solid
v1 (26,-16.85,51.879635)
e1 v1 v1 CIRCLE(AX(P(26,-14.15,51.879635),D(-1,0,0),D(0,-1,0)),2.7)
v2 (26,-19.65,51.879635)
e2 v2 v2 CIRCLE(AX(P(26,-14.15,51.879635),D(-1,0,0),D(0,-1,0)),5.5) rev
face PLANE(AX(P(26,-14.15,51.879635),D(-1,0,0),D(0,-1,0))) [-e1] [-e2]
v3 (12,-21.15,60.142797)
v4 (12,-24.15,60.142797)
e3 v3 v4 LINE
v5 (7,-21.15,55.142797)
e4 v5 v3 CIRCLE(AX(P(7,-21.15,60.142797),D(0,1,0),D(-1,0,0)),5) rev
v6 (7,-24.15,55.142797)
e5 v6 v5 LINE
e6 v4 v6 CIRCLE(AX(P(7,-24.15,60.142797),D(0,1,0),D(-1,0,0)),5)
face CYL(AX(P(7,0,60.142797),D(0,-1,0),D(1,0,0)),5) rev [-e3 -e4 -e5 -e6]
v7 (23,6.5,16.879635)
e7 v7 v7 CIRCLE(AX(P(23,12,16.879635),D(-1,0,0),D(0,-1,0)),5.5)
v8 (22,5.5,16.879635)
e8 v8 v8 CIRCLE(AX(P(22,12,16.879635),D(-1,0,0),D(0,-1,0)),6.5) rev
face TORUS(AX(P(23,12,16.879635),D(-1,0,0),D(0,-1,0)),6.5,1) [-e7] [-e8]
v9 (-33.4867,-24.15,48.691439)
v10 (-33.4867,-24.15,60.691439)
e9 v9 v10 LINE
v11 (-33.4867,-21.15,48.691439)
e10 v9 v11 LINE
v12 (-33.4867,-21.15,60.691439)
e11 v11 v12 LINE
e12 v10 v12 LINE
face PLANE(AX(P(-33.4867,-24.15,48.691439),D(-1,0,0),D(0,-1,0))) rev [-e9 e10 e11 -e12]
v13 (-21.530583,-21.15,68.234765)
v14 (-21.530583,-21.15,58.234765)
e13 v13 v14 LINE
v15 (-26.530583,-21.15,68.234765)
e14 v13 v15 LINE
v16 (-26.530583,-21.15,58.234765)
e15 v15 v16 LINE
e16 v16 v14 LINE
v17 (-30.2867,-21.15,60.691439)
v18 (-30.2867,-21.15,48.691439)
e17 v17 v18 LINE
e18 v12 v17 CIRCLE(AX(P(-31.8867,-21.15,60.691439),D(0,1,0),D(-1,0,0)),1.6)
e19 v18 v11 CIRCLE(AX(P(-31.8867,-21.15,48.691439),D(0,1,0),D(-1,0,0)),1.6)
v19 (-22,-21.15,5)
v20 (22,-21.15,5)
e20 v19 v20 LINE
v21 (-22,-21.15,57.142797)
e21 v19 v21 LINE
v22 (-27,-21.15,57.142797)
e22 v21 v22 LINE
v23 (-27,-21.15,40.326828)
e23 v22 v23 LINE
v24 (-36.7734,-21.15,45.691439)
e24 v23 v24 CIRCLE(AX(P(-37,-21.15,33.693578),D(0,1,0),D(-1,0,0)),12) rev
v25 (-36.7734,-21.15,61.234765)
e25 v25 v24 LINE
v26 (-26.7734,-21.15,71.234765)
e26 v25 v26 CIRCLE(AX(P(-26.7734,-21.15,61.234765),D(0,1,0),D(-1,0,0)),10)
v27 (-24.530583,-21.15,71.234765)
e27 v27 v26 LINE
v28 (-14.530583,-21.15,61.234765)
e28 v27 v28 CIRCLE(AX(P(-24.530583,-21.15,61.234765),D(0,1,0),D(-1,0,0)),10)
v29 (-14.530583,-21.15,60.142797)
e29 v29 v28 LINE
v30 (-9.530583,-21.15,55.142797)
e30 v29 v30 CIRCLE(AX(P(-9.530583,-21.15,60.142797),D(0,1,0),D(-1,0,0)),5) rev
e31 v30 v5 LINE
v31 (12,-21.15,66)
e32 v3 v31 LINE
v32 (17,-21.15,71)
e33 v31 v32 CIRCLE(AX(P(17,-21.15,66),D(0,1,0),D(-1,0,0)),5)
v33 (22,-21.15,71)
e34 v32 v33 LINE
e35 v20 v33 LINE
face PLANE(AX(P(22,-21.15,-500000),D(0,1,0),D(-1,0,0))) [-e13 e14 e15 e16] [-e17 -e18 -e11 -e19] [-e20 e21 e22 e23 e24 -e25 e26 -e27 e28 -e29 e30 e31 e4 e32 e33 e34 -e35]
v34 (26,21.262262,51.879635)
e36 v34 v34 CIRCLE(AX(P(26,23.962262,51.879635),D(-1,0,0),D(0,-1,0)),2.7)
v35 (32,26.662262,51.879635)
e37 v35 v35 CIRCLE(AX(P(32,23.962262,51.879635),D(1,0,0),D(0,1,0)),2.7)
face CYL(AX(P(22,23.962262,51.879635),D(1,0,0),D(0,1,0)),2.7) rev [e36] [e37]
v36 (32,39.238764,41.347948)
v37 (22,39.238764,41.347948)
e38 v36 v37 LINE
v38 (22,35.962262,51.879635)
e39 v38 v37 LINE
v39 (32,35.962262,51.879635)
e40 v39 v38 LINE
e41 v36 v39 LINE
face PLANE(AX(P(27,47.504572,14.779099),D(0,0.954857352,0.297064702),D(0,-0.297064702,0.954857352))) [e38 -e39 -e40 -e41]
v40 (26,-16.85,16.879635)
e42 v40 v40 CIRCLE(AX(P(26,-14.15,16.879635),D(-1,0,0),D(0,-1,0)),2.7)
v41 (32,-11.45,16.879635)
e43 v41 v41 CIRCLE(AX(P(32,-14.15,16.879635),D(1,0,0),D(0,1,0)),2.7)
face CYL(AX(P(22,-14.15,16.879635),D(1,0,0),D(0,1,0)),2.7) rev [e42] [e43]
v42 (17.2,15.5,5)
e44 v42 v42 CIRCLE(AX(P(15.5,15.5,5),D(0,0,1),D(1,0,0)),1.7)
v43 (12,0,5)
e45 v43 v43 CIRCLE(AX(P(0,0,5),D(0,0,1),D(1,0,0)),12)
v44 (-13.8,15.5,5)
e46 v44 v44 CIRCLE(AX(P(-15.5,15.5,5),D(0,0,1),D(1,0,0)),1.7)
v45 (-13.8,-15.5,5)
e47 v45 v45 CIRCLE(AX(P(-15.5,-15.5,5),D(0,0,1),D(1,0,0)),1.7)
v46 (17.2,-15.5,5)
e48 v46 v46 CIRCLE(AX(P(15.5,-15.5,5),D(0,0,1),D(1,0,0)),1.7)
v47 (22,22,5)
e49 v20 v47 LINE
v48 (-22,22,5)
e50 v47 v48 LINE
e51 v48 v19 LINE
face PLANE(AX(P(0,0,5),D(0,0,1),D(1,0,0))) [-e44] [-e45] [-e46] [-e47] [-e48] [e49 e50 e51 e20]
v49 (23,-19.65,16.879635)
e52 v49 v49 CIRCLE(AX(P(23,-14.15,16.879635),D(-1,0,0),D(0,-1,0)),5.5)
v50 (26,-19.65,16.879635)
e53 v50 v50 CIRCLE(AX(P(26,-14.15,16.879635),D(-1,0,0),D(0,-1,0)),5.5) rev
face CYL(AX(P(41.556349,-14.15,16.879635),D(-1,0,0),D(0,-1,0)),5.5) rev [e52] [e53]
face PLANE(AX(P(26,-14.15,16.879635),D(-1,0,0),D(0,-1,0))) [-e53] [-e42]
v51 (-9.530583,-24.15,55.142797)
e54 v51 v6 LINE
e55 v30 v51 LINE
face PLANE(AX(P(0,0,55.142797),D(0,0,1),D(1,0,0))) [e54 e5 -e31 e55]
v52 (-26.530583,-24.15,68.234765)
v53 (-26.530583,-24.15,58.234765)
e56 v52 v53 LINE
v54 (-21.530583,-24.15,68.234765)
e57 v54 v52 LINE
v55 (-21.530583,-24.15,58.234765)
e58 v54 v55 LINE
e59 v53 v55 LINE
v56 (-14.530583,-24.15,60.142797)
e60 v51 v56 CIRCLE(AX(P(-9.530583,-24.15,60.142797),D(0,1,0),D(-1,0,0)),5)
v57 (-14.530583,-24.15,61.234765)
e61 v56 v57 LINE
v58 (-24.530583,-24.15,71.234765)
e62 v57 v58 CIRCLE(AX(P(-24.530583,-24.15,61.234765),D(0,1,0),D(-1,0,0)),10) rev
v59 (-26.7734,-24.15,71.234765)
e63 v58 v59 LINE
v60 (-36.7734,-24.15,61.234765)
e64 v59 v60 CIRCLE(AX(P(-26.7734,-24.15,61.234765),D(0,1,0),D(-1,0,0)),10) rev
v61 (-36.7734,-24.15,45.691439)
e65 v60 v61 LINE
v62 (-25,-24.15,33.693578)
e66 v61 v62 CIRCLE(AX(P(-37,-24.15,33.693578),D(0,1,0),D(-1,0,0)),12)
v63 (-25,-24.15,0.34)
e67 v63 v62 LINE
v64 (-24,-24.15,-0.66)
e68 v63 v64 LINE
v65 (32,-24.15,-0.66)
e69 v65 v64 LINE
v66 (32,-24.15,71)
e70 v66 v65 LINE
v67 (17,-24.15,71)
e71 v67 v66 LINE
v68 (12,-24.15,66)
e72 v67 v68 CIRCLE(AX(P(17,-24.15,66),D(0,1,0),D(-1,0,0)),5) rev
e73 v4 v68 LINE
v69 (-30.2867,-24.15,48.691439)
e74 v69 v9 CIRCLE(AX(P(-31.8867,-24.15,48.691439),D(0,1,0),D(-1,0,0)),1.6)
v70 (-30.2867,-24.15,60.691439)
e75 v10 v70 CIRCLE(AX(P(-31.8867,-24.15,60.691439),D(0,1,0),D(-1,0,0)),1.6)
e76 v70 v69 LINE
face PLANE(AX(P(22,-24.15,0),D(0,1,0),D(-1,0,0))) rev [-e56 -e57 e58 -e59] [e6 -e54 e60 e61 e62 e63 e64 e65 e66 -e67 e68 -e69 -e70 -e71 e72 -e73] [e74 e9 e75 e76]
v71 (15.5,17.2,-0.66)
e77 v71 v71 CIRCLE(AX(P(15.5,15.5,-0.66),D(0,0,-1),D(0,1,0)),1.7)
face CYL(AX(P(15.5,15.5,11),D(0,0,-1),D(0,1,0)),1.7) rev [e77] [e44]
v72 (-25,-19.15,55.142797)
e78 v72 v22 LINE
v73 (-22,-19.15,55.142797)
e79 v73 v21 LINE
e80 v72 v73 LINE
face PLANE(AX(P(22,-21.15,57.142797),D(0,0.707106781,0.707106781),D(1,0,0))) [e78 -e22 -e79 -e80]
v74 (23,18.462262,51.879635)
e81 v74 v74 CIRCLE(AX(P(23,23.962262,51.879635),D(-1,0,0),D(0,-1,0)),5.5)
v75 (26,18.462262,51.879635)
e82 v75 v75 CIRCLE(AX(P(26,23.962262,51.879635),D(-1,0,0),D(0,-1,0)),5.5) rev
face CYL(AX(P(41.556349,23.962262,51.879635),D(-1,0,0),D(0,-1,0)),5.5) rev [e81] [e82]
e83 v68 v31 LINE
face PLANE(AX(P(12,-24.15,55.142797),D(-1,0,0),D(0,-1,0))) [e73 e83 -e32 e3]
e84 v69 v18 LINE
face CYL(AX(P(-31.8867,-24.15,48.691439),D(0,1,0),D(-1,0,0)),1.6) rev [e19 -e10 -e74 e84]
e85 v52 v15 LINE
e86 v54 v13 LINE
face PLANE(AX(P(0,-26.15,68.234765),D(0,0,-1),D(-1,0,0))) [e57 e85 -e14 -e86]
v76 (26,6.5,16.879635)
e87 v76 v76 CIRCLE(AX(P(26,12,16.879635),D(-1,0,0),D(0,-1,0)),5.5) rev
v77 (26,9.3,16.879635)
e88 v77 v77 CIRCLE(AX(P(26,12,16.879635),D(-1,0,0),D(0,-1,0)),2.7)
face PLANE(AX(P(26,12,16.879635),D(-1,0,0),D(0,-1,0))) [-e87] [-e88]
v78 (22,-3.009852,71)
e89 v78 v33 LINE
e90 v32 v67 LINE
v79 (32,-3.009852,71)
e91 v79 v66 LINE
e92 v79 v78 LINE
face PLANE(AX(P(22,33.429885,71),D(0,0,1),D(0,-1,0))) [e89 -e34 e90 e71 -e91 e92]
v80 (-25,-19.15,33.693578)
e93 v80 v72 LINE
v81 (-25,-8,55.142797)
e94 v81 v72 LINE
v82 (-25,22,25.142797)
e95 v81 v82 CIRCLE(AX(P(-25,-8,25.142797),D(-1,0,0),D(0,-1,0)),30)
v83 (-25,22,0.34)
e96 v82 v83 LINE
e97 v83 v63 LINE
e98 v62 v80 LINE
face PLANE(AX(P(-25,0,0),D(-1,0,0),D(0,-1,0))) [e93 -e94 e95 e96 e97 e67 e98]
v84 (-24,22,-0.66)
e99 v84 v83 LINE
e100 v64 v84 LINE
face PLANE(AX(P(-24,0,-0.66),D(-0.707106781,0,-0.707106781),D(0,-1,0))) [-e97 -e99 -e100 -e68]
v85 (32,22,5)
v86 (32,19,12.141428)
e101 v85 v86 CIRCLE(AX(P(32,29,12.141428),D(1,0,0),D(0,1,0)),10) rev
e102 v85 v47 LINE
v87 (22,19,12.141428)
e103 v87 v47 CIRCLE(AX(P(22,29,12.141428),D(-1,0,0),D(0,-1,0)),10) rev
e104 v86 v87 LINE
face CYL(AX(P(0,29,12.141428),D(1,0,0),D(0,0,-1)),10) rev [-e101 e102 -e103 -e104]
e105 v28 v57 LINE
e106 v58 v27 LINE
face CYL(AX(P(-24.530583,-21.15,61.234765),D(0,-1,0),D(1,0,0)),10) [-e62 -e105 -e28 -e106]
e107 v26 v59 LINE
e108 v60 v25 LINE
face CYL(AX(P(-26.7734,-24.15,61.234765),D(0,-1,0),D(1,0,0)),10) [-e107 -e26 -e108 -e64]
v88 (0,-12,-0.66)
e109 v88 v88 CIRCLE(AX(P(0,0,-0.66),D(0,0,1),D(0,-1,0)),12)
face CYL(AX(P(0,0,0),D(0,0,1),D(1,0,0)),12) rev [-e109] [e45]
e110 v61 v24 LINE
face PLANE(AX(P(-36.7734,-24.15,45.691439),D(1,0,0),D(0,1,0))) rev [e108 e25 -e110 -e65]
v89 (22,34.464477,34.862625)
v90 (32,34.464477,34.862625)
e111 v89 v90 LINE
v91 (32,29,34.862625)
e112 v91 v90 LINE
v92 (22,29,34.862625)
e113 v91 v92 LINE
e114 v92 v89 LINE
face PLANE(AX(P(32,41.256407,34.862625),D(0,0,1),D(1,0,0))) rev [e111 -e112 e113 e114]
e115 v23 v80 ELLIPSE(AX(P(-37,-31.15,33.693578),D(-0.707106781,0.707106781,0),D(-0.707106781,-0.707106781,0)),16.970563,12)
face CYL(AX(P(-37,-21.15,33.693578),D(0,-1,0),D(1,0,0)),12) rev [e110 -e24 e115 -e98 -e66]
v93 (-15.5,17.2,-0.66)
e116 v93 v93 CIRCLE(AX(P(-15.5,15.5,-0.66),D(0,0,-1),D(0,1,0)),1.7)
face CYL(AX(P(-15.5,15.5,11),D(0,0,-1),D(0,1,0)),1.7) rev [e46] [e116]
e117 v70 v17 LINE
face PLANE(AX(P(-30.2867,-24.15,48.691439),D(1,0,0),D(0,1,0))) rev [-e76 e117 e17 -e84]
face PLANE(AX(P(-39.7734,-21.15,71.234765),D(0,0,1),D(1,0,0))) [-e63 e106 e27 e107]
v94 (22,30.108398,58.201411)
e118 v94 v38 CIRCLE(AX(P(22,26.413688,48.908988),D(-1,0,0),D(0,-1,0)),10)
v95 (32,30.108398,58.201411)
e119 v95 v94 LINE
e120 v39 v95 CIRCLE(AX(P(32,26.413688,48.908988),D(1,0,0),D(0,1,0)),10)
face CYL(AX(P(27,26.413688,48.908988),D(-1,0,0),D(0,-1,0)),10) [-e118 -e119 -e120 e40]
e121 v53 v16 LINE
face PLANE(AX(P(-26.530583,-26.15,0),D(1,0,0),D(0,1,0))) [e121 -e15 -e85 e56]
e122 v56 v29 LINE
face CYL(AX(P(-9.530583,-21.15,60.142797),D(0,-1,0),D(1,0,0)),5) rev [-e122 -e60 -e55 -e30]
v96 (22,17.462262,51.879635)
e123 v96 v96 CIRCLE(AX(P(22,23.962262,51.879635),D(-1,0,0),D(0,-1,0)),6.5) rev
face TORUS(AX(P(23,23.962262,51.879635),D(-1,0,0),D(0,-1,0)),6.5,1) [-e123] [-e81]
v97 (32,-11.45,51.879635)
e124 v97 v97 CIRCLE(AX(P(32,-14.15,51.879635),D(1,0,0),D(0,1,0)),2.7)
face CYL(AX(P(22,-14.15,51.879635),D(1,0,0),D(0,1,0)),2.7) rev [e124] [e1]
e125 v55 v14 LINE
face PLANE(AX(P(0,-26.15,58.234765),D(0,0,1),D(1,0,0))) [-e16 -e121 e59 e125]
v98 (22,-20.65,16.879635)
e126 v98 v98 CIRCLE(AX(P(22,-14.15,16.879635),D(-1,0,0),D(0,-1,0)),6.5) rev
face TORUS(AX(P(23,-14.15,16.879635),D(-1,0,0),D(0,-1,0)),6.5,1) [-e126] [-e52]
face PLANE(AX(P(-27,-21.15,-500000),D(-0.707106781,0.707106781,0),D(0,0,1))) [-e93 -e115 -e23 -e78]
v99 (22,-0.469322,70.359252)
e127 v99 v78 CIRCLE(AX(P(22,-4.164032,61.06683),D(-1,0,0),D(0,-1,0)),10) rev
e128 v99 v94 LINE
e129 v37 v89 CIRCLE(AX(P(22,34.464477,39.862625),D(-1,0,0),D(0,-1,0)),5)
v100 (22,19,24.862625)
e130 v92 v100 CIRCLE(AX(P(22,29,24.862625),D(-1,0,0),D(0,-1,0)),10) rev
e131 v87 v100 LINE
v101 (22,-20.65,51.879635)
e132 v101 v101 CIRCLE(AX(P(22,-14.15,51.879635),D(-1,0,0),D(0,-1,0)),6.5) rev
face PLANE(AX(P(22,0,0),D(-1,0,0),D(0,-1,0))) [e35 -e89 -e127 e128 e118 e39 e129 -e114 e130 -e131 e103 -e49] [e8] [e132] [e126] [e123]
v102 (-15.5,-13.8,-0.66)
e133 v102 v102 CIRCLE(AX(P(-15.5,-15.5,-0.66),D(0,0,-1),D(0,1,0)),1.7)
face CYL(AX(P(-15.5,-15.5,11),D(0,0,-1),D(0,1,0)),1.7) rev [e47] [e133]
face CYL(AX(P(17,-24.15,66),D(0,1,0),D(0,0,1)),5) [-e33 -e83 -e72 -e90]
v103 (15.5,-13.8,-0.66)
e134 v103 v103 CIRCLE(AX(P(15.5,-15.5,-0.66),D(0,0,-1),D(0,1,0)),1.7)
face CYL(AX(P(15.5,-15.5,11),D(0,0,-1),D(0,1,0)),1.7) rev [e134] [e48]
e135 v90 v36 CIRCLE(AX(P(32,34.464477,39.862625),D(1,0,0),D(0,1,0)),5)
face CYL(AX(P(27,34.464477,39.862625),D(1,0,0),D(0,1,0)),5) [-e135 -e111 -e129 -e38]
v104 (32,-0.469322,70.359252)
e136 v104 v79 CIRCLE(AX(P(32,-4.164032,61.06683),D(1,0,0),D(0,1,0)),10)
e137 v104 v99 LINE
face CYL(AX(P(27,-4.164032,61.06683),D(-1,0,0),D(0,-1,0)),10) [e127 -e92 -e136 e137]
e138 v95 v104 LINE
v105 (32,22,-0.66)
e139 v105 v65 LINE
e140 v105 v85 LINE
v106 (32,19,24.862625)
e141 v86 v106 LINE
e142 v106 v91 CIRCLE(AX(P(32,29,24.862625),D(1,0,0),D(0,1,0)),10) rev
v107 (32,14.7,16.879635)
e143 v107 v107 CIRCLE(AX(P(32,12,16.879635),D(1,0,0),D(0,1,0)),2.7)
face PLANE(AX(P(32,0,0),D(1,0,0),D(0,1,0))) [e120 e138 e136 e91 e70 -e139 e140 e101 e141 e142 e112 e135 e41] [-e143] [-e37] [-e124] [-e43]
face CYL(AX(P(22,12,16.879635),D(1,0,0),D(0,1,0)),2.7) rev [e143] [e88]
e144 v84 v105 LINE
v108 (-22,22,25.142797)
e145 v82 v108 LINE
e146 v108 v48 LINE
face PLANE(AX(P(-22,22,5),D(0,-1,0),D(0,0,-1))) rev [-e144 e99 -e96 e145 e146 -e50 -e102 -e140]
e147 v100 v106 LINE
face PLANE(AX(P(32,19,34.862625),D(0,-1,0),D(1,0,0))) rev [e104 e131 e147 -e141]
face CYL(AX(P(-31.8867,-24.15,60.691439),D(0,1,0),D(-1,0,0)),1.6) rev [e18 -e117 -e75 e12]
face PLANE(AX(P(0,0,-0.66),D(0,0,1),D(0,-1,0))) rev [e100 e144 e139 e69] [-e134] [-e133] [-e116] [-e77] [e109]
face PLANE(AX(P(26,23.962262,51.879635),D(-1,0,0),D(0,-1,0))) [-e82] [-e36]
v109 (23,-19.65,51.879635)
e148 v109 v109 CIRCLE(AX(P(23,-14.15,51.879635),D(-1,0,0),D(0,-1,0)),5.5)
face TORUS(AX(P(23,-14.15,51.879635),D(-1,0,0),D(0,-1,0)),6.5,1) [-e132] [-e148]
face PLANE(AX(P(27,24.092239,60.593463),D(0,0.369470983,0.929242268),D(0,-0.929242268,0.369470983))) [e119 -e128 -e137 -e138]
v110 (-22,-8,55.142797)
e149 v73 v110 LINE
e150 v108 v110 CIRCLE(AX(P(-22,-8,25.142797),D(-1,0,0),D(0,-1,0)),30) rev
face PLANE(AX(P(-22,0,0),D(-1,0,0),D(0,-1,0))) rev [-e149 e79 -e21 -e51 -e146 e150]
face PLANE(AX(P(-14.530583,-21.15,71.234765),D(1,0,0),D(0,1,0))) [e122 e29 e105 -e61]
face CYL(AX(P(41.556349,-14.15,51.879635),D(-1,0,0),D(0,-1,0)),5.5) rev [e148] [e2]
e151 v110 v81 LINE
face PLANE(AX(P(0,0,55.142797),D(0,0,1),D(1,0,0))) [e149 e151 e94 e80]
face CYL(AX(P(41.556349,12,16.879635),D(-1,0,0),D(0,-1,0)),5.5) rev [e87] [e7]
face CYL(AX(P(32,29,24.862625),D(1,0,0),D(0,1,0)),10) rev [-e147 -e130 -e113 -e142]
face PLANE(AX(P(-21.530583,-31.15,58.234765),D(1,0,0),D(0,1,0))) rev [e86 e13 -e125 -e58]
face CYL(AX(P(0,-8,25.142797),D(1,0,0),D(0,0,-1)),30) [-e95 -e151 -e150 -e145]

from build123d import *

# Parameters (mm, degrees)
SKETCH_1_W            = 44
SKETCH_1_H            = 44
EXTRUDE_2_DEPTH       = 5
SKETCH_2_R            = 1.5
SKETCH_2_R_2          = 10
CUT_EXTRUDE_1_DEPTH   = 32.511902513
SKETCH_3_R            = 12
CUT_EXTRUDE_3_DEPTH   = 32.511902513
EXTRUDE_4_DEPTH       = 3
EXTRUDE_5_REACH       = 63.87
SKETCH_6_W            = 44
SKETCH_6_H            = 0.85
SKETCH_7_W            = 44
SKETCH_7_H            = 0.85
CUT_EXTRUDE_4_DEPTH   = 62.869792746
SKETCH_8_W            = 52.142796764
SKETCH_8_H            = 46.15
EXTRUDE_6_DEPTH       = 3
SKETCH_10_W           = 3
SKETCH_10_H           = 43.15
SKETCH_10_W_2         = 47
SKETCH_10_H_2         = 3
EXTRUDE_7_DEPTH       = 3
SKETCH_11_W           = 1
SKETCH_11_H           = 46.15
CUT_EXTRUDE_5_DEPTH   = 77.373755538
SKETCH_12_R           = 1.55
CUT_EXTRUDE_6_DEPTH   = 65.340228018
SKETCH_14_W           = 54.142796764
SKETCH_14_H           = 46.15
EXTRUDE_8_DEPTH       = 5
EXTRUDE_9_DEPTH       = 5
SKETCH_17_W           = 70
SKETCH_17_H           = 13.120666122
EXTRUDE_10_DEPTH      = 5
CUT_EXTRUDE_8_DEPTH   = 98.040990462
EXTRUDE_12_DEPTH      = 5
CUT_EXTRUDE_9_DEPTH   = 98.040990462
FILLET_2_R            = 5
SKETCH_23_W           = 10
SKETCH_23_H           = 15.857203236
EXTRUDE_13_DEPTH      = 3
FILLET_3_R            = 5
FILLET_4_R            = 5
EXTRUDE_14_DEPTH      = 3
FILLET_5_R            = 5
SKETCH_26_W           = 3
SKETCH_26_H           = 25.543326292
CUT_EXTRUDE_10_DEPTH  = 102.638722513
FILLET_10_R           = 10
FILLET_11_R           = 12
CHAMFER_1_SIZE        = 2
CUT_EXTRUDE_11_DEPTH  = 101.502684118
FILLET_12_R           = 30
SKETCH_28_W           = 2
SKETCH_28_H           = 10
CUT_EXTRUDE_12_DEPTH  = 5
CHAMFER_2_SIZE        = 1
SKETCH_29_R           = 2.55
CUT_EXTRUDE_14_DEPTH  = 12
SKETCH_30_R           = 4.5
CUT_EXTRUDE_15_DEPTH  = 4
FILLET_13_R           = 1
SKETCH_33_R           = 7.046537577
EXTRUDE_15_DEPTH      = 10
CUT_EXTRUDE_START     = -10
CUT_EXTRUDE_16_DEPTH  = 10
SKETCH_35_R           = 4.5
CUT_EXTRUDE_17_DEPTH  = 4
FILLET_15_R           = 1
SKETCH_36_R           = 1.7
CUT_EXTRUDE_18_DEPTH  = 10
EXTRUDE_16_DEPTH      = 1.66
EXTRUDE_16_DEPTH_BACK = 2
SKETCH_37_W           = 57
SKETCH_37_H           = 46.15
SKETCH_37_R           = 1.7
CHAMFER_3_SIZE        = 1
SKETCH_38_W           = 29.862624896
SKETCH_38_H           = 3
CUT_EXTRUDE_19_DEPTH  = 101.429822344
FILLET_16_R           = 10
SKETCH_39_R           = 2.7
CUT_EXTRUDE_20_DEPTH  = 10
SKETCH_40_R           = 12
CUT_EXTRUDE_21_DEPTH  = 10
SKETCH_41_R           = 5.5
CUT_EXTRUDE_22_DEPTH  = 4
FILLET_17_R           = 1
SKETCH_42_W           = 5
SKETCH_42_H           = 10
CUT_EXTRUDE_23_DEPTH  = 10


# Read off the part's stored shape, not the designer's step: Вырез-Вытянуть16
with BuildPart() as part:
    # Эскиз1 → Бобышка-Вытянуть2 (new body)
    with BuildSketch(Plane.XY):
        Rectangle(SKETCH_1_W, SKETCH_1_H)
    extrude(amount=EXTRUDE_2_DEPTH)

    # Эскиз2 → Вырез-Вытянуть1 (cut, through all)
    with BuildSketch(Plane.XY.offset(5)):
        with Locations((-15.5, 15.5)):
            Circle(SKETCH_2_R)
        Circle(SKETCH_2_R_2)
        with Locations((15.5, 15.5)):
            Circle(SKETCH_2_R)
        with Locations((15.5, -15.5)):
            Circle(SKETCH_2_R)
        with Locations((-15.5, -15.5)):
            Circle(SKETCH_2_R)
    extrude(amount=-CUT_EXTRUDE_1_DEPTH, mode=Mode.SUBTRACT)

    # Эскиз3 → Вырез-Вытянуть3 (cut, through all)
    with BuildSketch(Plane.XY.offset(5)):
        Circle(SKETCH_3_R)
    extrude(amount=-CUT_EXTRUDE_3_DEPTH, mode=Mode.SUBTRACT)

    # Эскиз5 → Бобышка-Вытянуть4 (add)
    with BuildSketch(Plane.XZ.offset(22)):
        Polygon((-22, 5), (-22, 52.142796764), (22, 52.142796764), (22, 5), (22, 0), (-22, 0), align=None)
    extrude(amount=EXTRUDE_4_DEPTH)

    # Эскиз6 → Бобышка-Вытянуть5 (add, up to next)
    with BuildSketch(Plane.XY.offset(52.142796764), mode=Mode.PRIVATE) as extrude_5_sk1:
        with Locations((0, -21.575)):
            Rectangle(SKETCH_6_W, SKETCH_6_H)
    extrude_5_tool1 = extrude(extrude_5_sk1.sketch, amount=-EXTRUDE_5_REACH, mode=Mode.PRIVATE) - part.part
    add(extrude_5_tool1.solids().sort_by_distance((0, -21.575, 52.142797))[0])

    # Эскиз7 → Вырез-Вытянуть4 (cut, through all)
    with BuildSketch(Plane.XY.offset(52.142796764)):
        with Locations((0, -24.575)):
            Rectangle(SKETCH_7_W, SKETCH_7_H)
    extrude(amount=-CUT_EXTRUDE_4_DEPTH, mode=Mode.SUBTRACT)

    # Эскиз8 → Бобышка-Вытянуть6 (add)
    with BuildSketch(Plane.ZY.offset(22)):
        with Locations((26.071398382, -1.075)):
            Rectangle(SKETCH_8_W, SKETCH_8_H)
    extrude(amount=EXTRUDE_6_DEPTH)

    # Эскиз10 → Бобышка-Вытянуть7 (add)
    with BuildSketch(Plane.XY.offset(52.142796764)):
        with Locations((-23.5, 0.425)):
            Rectangle(SKETCH_10_W, SKETCH_10_H)
        with Locations((-1.5, -22.65)):
            Rectangle(SKETCH_10_W_2, SKETCH_10_H_2)
    extrude(amount=EXTRUDE_7_DEPTH)

    # Эскиз11 → Вырез-Вытянуть5 (cut, through all)
    with BuildSketch(Plane(origin=(22, 0, 0), x_dir=(0, 0, -1), z_dir=(1, 0, 0))):
        with Locations((-0.5, -1.075)):
            Rectangle(SKETCH_11_W, SKETCH_11_H)
    extrude(amount=-CUT_EXTRUDE_5_DEPTH, mode=Mode.SUBTRACT)

    # Эскиз12 → Вырез-Вытянуть6 (cut, through all)
    with BuildSketch(Plane(origin=(0, 0, 1), x_dir=(-1, 0, 0), z_dir=(0, 0, -1))):
        with Locations(Location((-15.5, 15.5, 0), (0, 0, 90))):
            Circle(SKETCH_12_R)
        with Locations(Location((15.5, 15.5, 0), (0, 0, 90))):
            Circle(SKETCH_12_R)
        with Locations(Location((15.5, -15.5, 0), (0, 0, 90))):
            Circle(SKETCH_12_R)
        with Locations(Location((-15.5, -15.5, 0), (0, 0, 90))):
            Circle(SKETCH_12_R)
    extrude(amount=-CUT_EXTRUDE_6_DEPTH, mode=Mode.SUBTRACT)

    # Эскиз14 → Бобышка-Вытянуть8 (add)
    with BuildSketch(Plane(origin=(22, 0, 0), x_dir=(0, 0, -1), z_dir=(1, 0, 0))):
        with Locations((-28.071398382, -1.075)):
            Rectangle(SKETCH_14_W, SKETCH_14_H)
    extrude(amount=EXTRUDE_8_DEPTH)

    # Эскиз15 → Бобышка-Вытянуть9 (add)
    with BuildSketch(Plane(origin=(27, 0, 0), x_dir=(0, 0, -1), z_dir=(1, 0, 0))):
        Polygon((-1, 22), (-1, 33.429885216), (-71, 33.429885216), (-71, -24.15), (-55.142796764, -24.15), (-55.142796764, 22), align=None)
    extrude(amount=-EXTRUDE_9_DEPTH)

    # Эскиз17 → Бобышка-Вытянуть10 (add)
    with BuildSketch(Plane.ZY.offset(-22)):
        with Locations((36, 39.990218277)):
            Rectangle(SKETCH_17_W, SKETCH_17_H)
    extrude(amount=-EXTRUDE_10_DEPTH)

    # Эскиз18 → Вырез-Вытянуть8 (cut, through all)
    with BuildSketch(Plane.ZY.offset(-22)):
        with BuildLine():
            Line((58.201410897, 30.108398015), (70.359252493, -0.469322049))
            ThreePointArc((70.359252493, -0.469322049), (70.763191451, -1.718511281), (71, -3.009852494))
            Line((71, -3.009852494), (71, 46.550551338))
            Line((71, 46.550551338), (17.845614556, 46.550551338))
            Line((17.845614556, 46.550551338), (18.317714835, 46.403676699))
            Line((18.317714835, 46.403676699), (51.879635236, 35.962261704))
            ThreePointArc((51.879635236, 35.962261704), (55.703298309, 33.75108216), (58.201410897, 30.108398015))
        make_face()
    extrude(amount=-CUT_EXTRUDE_8_DEPTH, mode=Mode.SUBTRACT)

    # Эскиз21 → Бобышка-Вытянуть12 (add)
    with BuildSketch(Plane(origin=(27, 0, 0), x_dir=(0, 0, -1), z_dir=(1, 0, 0))):
        with BuildLine():
            Line((-1, 46.550551338), (-17.845614556, 46.550551338))
            Line((-17.845614556, 46.550551338), (-51.879635236, 35.962261704))
            ThreePointArc((-51.879635236, 35.962261704), (-55.703298309, 33.75108216), (-58.201410897, 30.108398015))
            Line((-58.201410897, 30.108398015), (-70.359252493, -0.469322049))
            ThreePointArc((-70.359252493, -0.469322049), (-70.763191451, -1.718511281), (-71, -3.009852494))
            Line((-71, -3.009852494), (-71, -24.15))
            Line((-71, -24.15), (-1, -24.15))
            Line((-1, -24.15), (-1, 46.550551338))
        make_face()
    extrude(amount=EXTRUDE_12_DEPTH)

    # Эскиз22 → Вырез-Вытянуть9 (cut, through all)
    with BuildSketch(Plane.ZY.offset(-22)):
        Polygon((1, 22), (1, 46.550551338), (17.845614556, 46.550551338), (34.862624896, 41.256406521), (34.862624896, 22), align=None)
    extrude(amount=-CUT_EXTRUDE_9_DEPTH, mode=Mode.SUBTRACT)

    # Скругление2
    fillet_2_edges = [part.edges().sort_by_distance(p)[0] for p in [
        (27, 41.256406521, 34.862624896),
    ]]
    fillet(fillet_2_edges, radius=FILLET_2_R)

    # Эскиз23 → Бобышка-Вытянуть13 (add)
    with BuildSketch(Plane(origin=(0, -21.15, 0), x_dir=(1, 0, 0), z_dir=(0, 1, 0))):
        with Locations((17, -63.071398382)):
            Rectangle(SKETCH_23_W, SKETCH_23_H)
    extrude(amount=-EXTRUDE_13_DEPTH)

    # Скругление3
    fillet_3_edges = [part.edges().sort_by_distance(p)[0] for p in [
        (12, -22.65, 55.142796764),
    ]]
    fillet(fillet_3_edges, radius=FILLET_3_R)

    # Скругление4
    fillet_4_edges = [part.edges().sort_by_distance(p)[0] for p in [
        (12, -22.65, 71),
    ]]
    fillet(fillet_4_edges, radius=FILLET_4_R)

    # Эскиз25 → Бобышка-Вытянуть14 (add)
    with BuildSketch(Plane.XZ.offset(24.15)):
        Polygon((-25, 45.691438505), (-39.773399836, 45.691438505), (-39.773399836, 71.234764797), (-14.530583265, 71.234764797), (-14.530583265, 45.691438505), align=None)
    extrude(amount=-EXTRUDE_14_DEPTH)

    # Скругление5
    fillet_5_edges = [part.edges().sort_by_distance(p)[0] for p in [
        (-14.530583265, -22.65, 55.142796764),
    ]]
    fillet(fillet_5_edges, radius=FILLET_5_R)

    # Эскиз26 → Вырез-Вытянуть10 (cut, through all)
    with BuildSketch(Plane(origin=(0, -21.15, 0), x_dir=(1, 0, 0), z_dir=(0, 1, 0))):
        with Locations((-38.273399836, -58.463101651)):
            Rectangle(SKETCH_26_W, SKETCH_26_H)
    extrude(amount=-CUT_EXTRUDE_10_DEPTH, mode=Mode.SUBTRACT)

    # Скругление10
    fillet_10_edges = [part.edges().sort_by_distance(p)[0] for p in [
        (-14.530583265, -22.65, 71.234764797),
        (-36.773399836, -22.65, 71.234764797),
    ]]
    fillet(fillet_10_edges, radius=FILLET_10_R)

    # Скругление11
    # the kernel refuses this fillet: 12 mm, written as the material it adds along each edge
    with BuildSketch(Plane(origin=(-25, -21.15, 45.691438505), x_dir=(-1, 0, 0), z_dir=(0, -1, 0))) as fillet_11_piece_1:
        with BuildLine():
            CenterArc((12, 11.997860324), FILLET_11_R, 180, 88.917999605)
            Line((0, 11.997860324), (-0.24, 11.997860324))
            Line((-0.24, 11.997860324), (-0.24, 0))
            Line((-0.24, 0), (0, -0.24))
            ThreePointArc((0, -0.24), (5.886699918, -0.24), (11.768867833, -0.239957206))
            Line((11.768867833, -0.239957206), (11.773399836, 0))
        make_face()
    extrude(amount=3)

    # Фаска1
    chamfer_1_edges = [part.edges().sort_by_distance(p)[0] for p in [
        (-23.5, -21.15, 55.142796764),
        (-25, -21.15, 44.418187472),
    ]]
    chamfer(chamfer_1_edges, length=CHAMFER_1_SIZE)

    # Эскиз27 → Вырез-Вытянуть11 (cut, through all)
    with BuildSketch(Plane(origin=(0, -21.15, 0), x_dir=(1, 0, 0), z_dir=(0, 1, 0))):
        with BuildLine():
            Line((-33.486699918, -48.691438505), (-33.486699918, -60.691438505))
            ThreePointArc((-33.486699918, -60.691438505), (-31.886699918, -62.291438505), (-30.286699918, -60.691438505))
            Line((-30.286699918, -60.691438505), (-30.286699918, -48.691438505))
            ThreePointArc((-30.286699918, -48.691438505), (-31.886699918, -47.091438505), (-33.486699918, -48.691438505))
        make_face()
    extrude(amount=-CUT_EXTRUDE_11_DEPTH, mode=Mode.SUBTRACT)

    # Скругление12
    fillet_12_edges = [part.edges().sort_by_distance(p)[0] for p in [
        (-23.5, 22, 55.142796764),
    ]]
    fillet(fillet_12_edges, radius=FILLET_12_R)

    # Эскиз28 → Вырез-Вытянуть12 (cut)
    with BuildSketch(Plane(origin=(0, -21.15, 0), x_dir=(1, 0, 0), z_dir=(0, 1, 0))):
        with Locations((-23.530583265, -63.234764797)):
            Rectangle(SKETCH_28_W, SKETCH_28_H)
        with Locations((-25.530583265, -63.234764797)):
            Rectangle(SKETCH_28_W, SKETCH_28_H)
    extrude(amount=-CUT_EXTRUDE_12_DEPTH, mode=Mode.SUBTRACT)

    # Фаска2
    chamfer_2_edges = [part.edges().sort_by_distance(p)[0] for p in [
        (-25, -1.075, 1),
    ]]
    chamfer(chamfer_2_edges, length=CHAMFER_2_SIZE)

    # Эскиз29 → Вырез-Вытянуть14 (cut)
    with BuildSketch(Plane(origin=(32, 0, 0), x_dir=(0, 0, -1), z_dir=(1, 0, 0))):
        with Locations(Location((-46.879635236, 23.962261704, 0), (0, 0, 90))):
            Circle(SKETCH_29_R)
        with Locations(Location((-51.879635236, -14.15, 0), (0, 0, 90))):
            Circle(SKETCH_29_R)
        with Locations(Location((-16.879635236, -14.15, 0), (0, 0, 90))):
            Circle(SKETCH_29_R)
        with Locations(Location((-16.879635236, 12, 0), (0, 0, 90))):
            Circle(SKETCH_29_R)
    extrude(amount=-CUT_EXTRUDE_14_DEPTH, mode=Mode.SUBTRACT)

    # Эскиз30 → Вырез-Вытянуть15 (cut)
    with BuildSketch(Plane.ZY.offset(-22)):
        with Locations(Location((46.879635236, 23.962261704, 0), (0, 0, 270))):
            Circle(SKETCH_30_R)
        with Locations(Location((16.879635236, 12, 0), (0, 0, 270))):
            Circle(SKETCH_30_R)
        with Locations(Location((16.879635236, -14.15, 0), (0, 0, 270))):
            Circle(SKETCH_30_R)
        with Locations(Location((51.879635236, -14.15, 0), (0, 0, 270))):
            Circle(SKETCH_30_R)
    extrude(amount=-CUT_EXTRUDE_15_DEPTH, mode=Mode.SUBTRACT)

    # Скругление13
    fillet_13_edges = [part.edges().sort_by_distance(p)[0] for p in [
        (22, 28.462261704, 46.879635236),
        (22, 16.5, 16.879635236),
        (22, -9.65, 16.879635236),
        (22, -9.65, 51.879635236),
    ]]
    fillet(fillet_13_edges, radius=FILLET_13_R)

    # Эскиз33 → Бобышка-Вытянуть15 (add)
    with BuildSketch(Plane.ZY.offset(-22)):
        with Locations((46.879635236, 23.962261704)):
            Circle(SKETCH_33_R)
    extrude(amount=-EXTRUDE_15_DEPTH)

    # Вырез-Вытянуть16 outline → Вырез-Вытянуть16 (cut)
    with BuildSketch(Plane(origin=(32, 0, 0), x_dir=(0, 0, -1), z_dir=(1, 0, 0)).offset(CUT_EXTRUDE_START)):
        with BuildLine():
            ThreePointArc((-49.404885236, 23.607843254), (-49.429635236, 23.962261703), (-49.404885236, 24.316680153))
            ThreePointArc((-49.404885236, 24.316680153), (-54.379635236, 23.962261703), (-49.404885236, 23.607843254))
        make_face()
    extrude(amount=CUT_EXTRUDE_16_DEPTH, mode=Mode.SUBTRACT)

    # Эскиз35 → Вырез-Вытянуть17 (cut)
    with BuildSketch(Plane.ZY.offset(-22)):
        with Locations(Location((51.879635236, 23.962261704, 0), (0, 0, 270))):
            Circle(SKETCH_35_R)
    extrude(amount=-CUT_EXTRUDE_17_DEPTH, mode=Mode.SUBTRACT)

    # Скругление15
    fillet_15_edges = [part.edges().sort_by_distance(p)[0] for p in [
        (22, 28.462261704, 51.879635236),
    ]]
    fillet(fillet_15_edges, radius=FILLET_15_R)

    # Эскиз36 → Вырез-Вытянуть18 (cut)
    with BuildSketch(Plane(origin=(0, 0, 1), x_dir=(-1, 0, 0), z_dir=(0, 0, -1))):
        with Locations(Location((-15.5, 15.5, 0), (0, 0, 90))):
            Circle(SKETCH_36_R)
        with Locations(Location((15.5, 15.5, 0), (0, 0, 90))):
            Circle(SKETCH_36_R)
        with Locations(Location((15.5, -15.5, 0), (0, 0, 90))):
            Circle(SKETCH_36_R)
        with Locations(Location((-15.5, -15.5, 0), (0, 0, 90))):
            Circle(SKETCH_36_R)
    extrude(amount=-CUT_EXTRUDE_18_DEPTH, mode=Mode.SUBTRACT)

    # Эскиз37 → Бобышка-Вытянуть16 (add, two sides: drawn at the far end of the back side and taken through both)
    with BuildSketch(Plane(origin=(0, 0, 1), x_dir=(-1, 0, 0), z_dir=(0, 0, -1)).offset(-EXTRUDE_16_DEPTH_BACK)):
        with Locations((-3.5, -1.075)):
            Rectangle(SKETCH_37_W, SKETCH_37_H)
        with Locations(Location((-15.5, -15.5, 0), (0, 0, 90))):
            Circle(SKETCH_37_R, mode=Mode.SUBTRACT)
        with Locations(Location((15.5, -15.5, 0), (0, 0, 90))):
            Circle(SKETCH_37_R, mode=Mode.SUBTRACT)
        with Locations(Location((15.5, 15.5, 0), (0, 0, 90))):
            Circle(SKETCH_37_R, mode=Mode.SUBTRACT)
        with Locations(Location((-15.5, 15.5, 0), (0, 0, 90))):
            Circle(SKETCH_37_R, mode=Mode.SUBTRACT)
    extrude(amount=EXTRUDE_16_DEPTH + EXTRUDE_16_DEPTH_BACK)

    # Фаска3
    chamfer_3_edges = [part.edges().sort_by_distance(p)[0] for p in [
        (-25, -1.075, -0.66),
    ]]
    chamfer(chamfer_3_edges, length=CHAMFER_3_SIZE)

    # Эскиз38 → Вырез-Вытянуть19 (cut, through all)
    with BuildSketch(Plane.ZY.offset(-22)):
        with Locations((19.931312448, 20.5)):
            Rectangle(SKETCH_38_W, SKETCH_38_H)
    extrude(amount=-CUT_EXTRUDE_19_DEPTH, mode=Mode.SUBTRACT)

    # Скругление16
    # the kernel refuses this fillet: 10 mm, written as the material it adds along each edge
    with BuildSketch(Plane(origin=(22, 19, 34.862624896), x_dir=(0, 1, 0), z_dir=(1, 0, 0))) as fillet_16_piece_1:
        with BuildLine():
            CenterArc((FILLET_16_R, -FILLET_16_R), FILLET_16_R, 90, 90)
            Line((0, -FILLET_16_R), (-FILLET_16_R * 0.02, -FILLET_16_R))
            Line((-FILLET_16_R * 0.02, -FILLET_16_R), (-FILLET_16_R * 0.02, FILLET_16_R * 0.02))
            Line((-FILLET_16_R * 0.02, FILLET_16_R * 0.02), (FILLET_16_R, FILLET_16_R * 0.02))
            Line((FILLET_16_R, FILLET_16_R * 0.02), (FILLET_16_R, 0))
        make_face()
    extrude(amount=10)
    with BuildSketch(Plane(origin=(22, 19, 5), x_dir=(0, 0, 1), z_dir=(1, 0, 0))) as fillet_16_piece_2:
        with BuildLine():
            CenterArc((7.141428429, -10), FILLET_16_R, 90, 45.572995999)
            Line((0, -3), (-0.142828569, -2.86))
            ThreePointArc((-0.142828569, -2.86), (-0.2, -1.5), (-0.2, 0))
            Line((-0.2, 0), (0, 0.2))
            Line((0, 0.2), (7.141428429, 0.2))
            Line((7.141428429, 0.2), (7.141428429, 0))
        make_face()
    extrude(amount=10)

    # Эскиз39 → Вырез-Вытянуть20 (cut)
    with BuildSketch(Plane(origin=(32, 0, 0), x_dir=(0, 0, -1), z_dir=(1, 0, 0))):
        with Locations(Location((-51.879635236, 23.962261704, 0), (0, 0, 90))):
            Circle(SKETCH_39_R)
        with Locations(Location((-16.879635236, 12, 0), (0, 0, 90))):
            Circle(SKETCH_39_R)
        with Locations(Location((-16.879635236, -14.15, 0), (0, 0, 90))):
            Circle(SKETCH_39_R)
        with Locations(Location((-51.879635236, -14.15, 0), (0, 0, 90))):
            Circle(SKETCH_39_R)
    extrude(amount=-CUT_EXTRUDE_20_DEPTH, mode=Mode.SUBTRACT)

    # Эскиз40 → Вырез-Вытянуть21 (cut)
    with BuildSketch(Plane.XY.offset(5)):
        Circle(SKETCH_40_R)
    extrude(amount=-CUT_EXTRUDE_21_DEPTH, mode=Mode.SUBTRACT)

    # Эскиз41 → Вырез-Вытянуть22 (cut)
    with BuildSketch(Plane.ZY.offset(-22)):
        with Locations(Location((51.879635236, 23.962261704, 0), (0, 0, 270))):
            Circle(SKETCH_41_R)
        with Locations(Location((51.879635236, -14.15, 0), (0, 0, 270))):
            Circle(SKETCH_41_R)
        with Locations(Location((16.879635236, 12, 0), (0, 0, 270))):
            Circle(SKETCH_41_R)
        with Locations(Location((16.879635236, -14.15, 0), (0, 0, 270))):
            Circle(SKETCH_41_R)
    extrude(amount=-CUT_EXTRUDE_22_DEPTH, mode=Mode.SUBTRACT)

    # Скругление17
    fillet_17_edges = [part.edges().sort_by_distance(p)[0] for p in [
        (22, 29.462261704, 51.879635236),
        (22, -8.65, 51.879635236),
        (22, 17.5, 16.879635236),
        (22, -8.65, 16.879635236),
    ]]
    fillet(fillet_17_edges, radius=FILLET_17_R)

    # Эскиз42 → Вырез-Вытянуть23 (cut)
    with BuildSketch(Plane(origin=(0, -21.15, 0), x_dir=(1, 0, 0), z_dir=(0, 1, 0))):
        with Locations((-24.030583265, -63.234764797)):
            Rectangle(SKETCH_42_W, SKETCH_42_H)
    extrude(amount=-CUT_EXTRUDE_23_DEPTH, mode=Mode.SUBTRACT)


solid = part.part
